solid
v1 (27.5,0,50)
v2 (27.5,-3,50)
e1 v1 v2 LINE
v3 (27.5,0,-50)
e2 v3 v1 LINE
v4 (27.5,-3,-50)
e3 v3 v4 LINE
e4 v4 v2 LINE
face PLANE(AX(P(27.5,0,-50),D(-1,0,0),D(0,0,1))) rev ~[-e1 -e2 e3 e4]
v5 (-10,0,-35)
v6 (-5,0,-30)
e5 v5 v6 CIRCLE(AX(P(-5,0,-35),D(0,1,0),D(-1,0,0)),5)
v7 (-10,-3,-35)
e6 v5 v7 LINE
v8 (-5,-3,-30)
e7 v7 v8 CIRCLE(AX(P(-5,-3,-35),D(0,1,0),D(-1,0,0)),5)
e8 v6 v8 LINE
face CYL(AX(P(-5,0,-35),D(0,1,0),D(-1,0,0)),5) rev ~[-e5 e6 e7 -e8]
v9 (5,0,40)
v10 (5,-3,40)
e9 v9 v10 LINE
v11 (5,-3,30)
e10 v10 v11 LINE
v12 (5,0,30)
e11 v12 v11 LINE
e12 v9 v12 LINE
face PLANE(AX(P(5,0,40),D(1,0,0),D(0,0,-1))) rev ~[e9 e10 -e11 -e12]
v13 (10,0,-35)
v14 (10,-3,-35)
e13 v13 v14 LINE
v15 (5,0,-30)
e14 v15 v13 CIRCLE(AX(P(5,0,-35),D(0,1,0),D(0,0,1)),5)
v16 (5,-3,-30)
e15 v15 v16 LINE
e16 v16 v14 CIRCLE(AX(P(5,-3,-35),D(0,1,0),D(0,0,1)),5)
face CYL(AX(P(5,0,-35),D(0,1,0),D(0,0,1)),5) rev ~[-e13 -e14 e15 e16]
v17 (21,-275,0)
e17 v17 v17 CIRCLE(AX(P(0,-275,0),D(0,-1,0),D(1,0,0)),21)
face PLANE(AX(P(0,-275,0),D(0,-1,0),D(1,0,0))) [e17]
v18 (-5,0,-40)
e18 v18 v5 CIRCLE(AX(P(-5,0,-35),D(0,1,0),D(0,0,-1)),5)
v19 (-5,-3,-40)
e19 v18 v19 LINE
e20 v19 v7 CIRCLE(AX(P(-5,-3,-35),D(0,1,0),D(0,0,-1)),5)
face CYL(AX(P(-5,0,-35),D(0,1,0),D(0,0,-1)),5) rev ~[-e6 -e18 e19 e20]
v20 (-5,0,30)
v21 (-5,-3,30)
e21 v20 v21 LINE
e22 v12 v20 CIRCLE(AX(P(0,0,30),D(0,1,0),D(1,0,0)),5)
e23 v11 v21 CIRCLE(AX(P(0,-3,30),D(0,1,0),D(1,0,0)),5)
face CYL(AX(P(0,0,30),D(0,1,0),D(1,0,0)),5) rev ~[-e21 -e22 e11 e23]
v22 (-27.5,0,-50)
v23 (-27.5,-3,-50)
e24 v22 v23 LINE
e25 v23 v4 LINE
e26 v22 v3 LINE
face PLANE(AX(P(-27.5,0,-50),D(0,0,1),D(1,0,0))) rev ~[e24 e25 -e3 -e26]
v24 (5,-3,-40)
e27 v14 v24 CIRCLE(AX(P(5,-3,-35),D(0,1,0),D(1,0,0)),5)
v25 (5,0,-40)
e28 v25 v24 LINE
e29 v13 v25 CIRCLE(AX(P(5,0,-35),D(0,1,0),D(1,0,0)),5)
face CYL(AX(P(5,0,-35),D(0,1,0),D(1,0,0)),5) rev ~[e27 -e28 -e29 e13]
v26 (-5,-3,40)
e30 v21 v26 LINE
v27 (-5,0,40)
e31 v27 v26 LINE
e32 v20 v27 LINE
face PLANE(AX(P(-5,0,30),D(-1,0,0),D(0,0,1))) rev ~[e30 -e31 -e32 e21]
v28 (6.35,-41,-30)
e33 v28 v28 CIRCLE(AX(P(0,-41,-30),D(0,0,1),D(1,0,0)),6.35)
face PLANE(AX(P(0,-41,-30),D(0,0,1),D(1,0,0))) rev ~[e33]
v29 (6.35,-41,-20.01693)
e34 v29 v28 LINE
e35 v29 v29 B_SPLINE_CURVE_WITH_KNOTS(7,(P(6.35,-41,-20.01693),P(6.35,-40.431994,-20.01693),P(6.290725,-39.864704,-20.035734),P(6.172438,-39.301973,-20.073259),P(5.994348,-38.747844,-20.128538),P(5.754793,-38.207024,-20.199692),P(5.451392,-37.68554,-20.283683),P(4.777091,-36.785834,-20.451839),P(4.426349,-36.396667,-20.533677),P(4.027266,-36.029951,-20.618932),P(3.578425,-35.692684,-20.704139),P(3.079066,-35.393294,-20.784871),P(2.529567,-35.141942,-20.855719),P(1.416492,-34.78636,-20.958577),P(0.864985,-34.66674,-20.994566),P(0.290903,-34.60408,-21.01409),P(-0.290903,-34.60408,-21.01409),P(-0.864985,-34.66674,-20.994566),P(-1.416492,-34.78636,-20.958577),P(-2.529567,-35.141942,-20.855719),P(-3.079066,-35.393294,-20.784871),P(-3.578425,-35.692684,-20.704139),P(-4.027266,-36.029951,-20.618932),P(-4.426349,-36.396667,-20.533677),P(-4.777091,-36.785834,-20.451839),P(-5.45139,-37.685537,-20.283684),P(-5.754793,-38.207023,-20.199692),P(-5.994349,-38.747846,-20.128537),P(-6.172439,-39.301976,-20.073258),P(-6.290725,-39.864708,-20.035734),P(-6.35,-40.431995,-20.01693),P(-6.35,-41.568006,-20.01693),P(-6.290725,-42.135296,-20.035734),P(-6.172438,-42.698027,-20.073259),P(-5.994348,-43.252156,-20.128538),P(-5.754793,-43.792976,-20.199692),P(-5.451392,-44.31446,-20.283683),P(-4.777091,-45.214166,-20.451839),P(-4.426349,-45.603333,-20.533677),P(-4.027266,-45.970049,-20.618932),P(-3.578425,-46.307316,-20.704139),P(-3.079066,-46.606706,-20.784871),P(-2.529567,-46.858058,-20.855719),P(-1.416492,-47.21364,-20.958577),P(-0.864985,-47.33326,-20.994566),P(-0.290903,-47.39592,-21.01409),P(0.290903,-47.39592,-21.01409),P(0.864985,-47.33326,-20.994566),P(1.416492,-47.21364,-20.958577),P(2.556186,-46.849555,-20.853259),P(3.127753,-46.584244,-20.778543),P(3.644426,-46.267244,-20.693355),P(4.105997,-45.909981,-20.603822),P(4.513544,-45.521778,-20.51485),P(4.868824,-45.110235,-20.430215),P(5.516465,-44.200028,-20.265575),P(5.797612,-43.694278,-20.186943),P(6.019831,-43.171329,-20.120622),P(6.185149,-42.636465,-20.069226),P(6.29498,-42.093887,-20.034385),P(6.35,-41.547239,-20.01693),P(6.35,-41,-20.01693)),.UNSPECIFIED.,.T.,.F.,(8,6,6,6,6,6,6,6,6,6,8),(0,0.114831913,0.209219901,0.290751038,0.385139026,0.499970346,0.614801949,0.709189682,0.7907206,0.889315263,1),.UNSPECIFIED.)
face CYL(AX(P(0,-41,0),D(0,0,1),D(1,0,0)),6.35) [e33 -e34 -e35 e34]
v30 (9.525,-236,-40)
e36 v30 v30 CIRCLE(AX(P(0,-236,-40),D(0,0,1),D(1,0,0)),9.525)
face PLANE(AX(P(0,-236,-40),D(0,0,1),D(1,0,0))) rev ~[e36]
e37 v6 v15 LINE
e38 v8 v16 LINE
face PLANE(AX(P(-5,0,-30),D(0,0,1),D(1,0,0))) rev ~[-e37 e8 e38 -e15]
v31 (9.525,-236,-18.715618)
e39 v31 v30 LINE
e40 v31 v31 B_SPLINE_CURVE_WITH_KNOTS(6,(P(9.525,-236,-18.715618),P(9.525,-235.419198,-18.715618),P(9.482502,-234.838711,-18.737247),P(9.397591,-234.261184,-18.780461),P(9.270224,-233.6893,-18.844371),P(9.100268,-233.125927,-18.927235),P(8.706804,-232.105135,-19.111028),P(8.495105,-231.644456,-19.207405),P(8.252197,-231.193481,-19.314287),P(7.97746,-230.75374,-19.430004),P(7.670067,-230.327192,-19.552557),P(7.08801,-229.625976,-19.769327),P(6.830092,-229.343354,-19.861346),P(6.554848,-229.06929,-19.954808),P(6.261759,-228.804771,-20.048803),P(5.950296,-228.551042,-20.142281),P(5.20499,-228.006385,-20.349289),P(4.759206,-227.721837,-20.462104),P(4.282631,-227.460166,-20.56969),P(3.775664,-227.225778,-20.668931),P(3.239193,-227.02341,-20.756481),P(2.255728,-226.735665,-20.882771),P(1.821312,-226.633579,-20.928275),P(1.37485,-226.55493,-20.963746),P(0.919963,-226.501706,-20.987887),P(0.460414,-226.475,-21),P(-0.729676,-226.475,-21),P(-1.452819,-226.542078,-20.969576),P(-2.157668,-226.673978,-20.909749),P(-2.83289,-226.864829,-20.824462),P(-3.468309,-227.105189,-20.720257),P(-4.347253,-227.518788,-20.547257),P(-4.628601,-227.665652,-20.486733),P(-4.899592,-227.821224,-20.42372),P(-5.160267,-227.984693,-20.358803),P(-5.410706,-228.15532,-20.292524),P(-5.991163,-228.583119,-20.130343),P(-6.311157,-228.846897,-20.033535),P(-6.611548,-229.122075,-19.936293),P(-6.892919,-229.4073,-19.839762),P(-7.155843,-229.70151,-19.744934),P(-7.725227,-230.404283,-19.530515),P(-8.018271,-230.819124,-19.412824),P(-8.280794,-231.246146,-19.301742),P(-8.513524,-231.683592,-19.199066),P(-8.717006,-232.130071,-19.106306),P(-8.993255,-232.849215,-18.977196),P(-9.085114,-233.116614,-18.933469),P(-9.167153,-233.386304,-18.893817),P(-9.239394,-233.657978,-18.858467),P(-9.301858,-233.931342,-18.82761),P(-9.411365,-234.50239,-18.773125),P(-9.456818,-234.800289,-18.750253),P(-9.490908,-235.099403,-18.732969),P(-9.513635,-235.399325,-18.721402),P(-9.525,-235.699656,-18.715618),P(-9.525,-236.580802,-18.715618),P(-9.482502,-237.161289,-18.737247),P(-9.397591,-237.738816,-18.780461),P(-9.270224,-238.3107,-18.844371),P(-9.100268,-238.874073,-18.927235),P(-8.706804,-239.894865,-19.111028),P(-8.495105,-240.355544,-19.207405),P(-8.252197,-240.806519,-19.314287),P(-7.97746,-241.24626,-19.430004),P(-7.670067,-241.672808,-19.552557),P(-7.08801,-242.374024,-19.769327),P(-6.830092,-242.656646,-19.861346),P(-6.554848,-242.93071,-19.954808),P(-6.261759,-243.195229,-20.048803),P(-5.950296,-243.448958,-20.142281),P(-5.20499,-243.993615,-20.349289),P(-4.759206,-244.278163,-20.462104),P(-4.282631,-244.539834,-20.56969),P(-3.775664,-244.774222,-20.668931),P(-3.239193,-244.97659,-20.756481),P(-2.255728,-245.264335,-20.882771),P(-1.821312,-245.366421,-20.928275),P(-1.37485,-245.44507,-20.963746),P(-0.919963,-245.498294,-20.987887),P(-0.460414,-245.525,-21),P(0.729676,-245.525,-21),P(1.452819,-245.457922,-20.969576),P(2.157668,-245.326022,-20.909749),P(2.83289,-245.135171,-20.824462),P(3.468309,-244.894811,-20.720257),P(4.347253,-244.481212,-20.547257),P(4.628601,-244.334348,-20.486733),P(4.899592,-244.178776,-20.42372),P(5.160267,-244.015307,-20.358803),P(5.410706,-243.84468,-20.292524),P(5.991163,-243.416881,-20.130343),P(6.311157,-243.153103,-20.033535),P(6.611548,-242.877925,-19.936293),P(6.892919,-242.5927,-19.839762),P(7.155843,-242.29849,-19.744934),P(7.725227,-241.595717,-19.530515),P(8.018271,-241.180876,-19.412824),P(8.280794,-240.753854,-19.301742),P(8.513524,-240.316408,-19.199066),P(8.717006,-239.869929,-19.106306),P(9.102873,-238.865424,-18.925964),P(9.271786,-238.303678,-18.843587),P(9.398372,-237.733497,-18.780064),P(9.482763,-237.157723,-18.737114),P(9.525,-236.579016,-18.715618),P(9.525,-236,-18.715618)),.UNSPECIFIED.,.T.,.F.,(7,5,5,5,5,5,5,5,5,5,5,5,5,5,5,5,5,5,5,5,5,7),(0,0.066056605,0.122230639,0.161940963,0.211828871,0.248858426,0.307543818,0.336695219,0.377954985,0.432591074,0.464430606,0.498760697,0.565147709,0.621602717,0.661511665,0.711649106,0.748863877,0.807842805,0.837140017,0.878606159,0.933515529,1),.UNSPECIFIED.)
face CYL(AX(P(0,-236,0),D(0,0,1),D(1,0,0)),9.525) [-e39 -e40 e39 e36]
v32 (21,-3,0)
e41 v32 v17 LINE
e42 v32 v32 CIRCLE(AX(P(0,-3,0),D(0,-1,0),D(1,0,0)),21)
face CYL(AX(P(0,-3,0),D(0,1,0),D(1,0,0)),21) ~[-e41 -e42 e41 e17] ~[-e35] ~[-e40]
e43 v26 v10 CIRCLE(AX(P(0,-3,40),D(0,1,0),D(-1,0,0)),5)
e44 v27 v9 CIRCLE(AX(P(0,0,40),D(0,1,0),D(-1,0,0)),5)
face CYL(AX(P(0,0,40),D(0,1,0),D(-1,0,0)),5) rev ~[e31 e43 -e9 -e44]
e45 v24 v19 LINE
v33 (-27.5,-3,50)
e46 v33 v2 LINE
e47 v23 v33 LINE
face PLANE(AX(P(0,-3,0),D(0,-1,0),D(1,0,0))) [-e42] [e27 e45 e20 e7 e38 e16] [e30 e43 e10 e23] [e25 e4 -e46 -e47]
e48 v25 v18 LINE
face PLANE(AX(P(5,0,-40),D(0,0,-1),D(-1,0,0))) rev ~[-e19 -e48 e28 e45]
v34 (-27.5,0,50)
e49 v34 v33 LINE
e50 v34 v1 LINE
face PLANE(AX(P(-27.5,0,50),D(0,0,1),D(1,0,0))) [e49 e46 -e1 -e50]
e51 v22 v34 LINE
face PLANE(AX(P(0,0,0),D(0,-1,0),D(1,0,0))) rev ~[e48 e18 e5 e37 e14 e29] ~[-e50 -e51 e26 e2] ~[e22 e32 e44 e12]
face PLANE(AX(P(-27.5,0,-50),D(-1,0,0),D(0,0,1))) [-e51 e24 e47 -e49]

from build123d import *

# Parameters (mm, degrees)
F0_W     = 55
F0_H     = 100
F1_DEPTH = 3
F2_R     = 21
F3_DEPTH = 272
F4_R     = 6.35
F5_DEPTH = 30
F4_R_2   = 9.525
F6_DEPTH = 40


# Not quite as in the source:
# - a feature names something its author has since deleted; it is built from what else it names


with BuildPart() as f1:
    # F0 (on Front) → F1 (new body)
    with BuildSketch(Plane.XZ):
        Rectangle(F0_W, F0_H)
        with BuildLine():
            ThreePointArc((-10, -35), (-8.5355339059, -31.4644660941), (-5, -30))
            Line((-5, -30), (0, -30))
            Line((0, -30), (5, -30))
            ThreePointArc((5, -30), (8.5355339059, -31.4644660941), (10, -35))
            ThreePointArc((10, -35), (8.5355339059, -38.5355339059), (5, -40))
            Line((5, -40), (0, -40))
            Line((0, -40), (-5, -40))
            ThreePointArc((-5, -40), (-8.5355339059, -38.5355339059), (-10, -35))
        make_face(mode=Mode.SUBTRACT)
        with BuildLine():
            Line((-5, 30), (-5, 40))
            ThreePointArc((-5, 40), (0, 45), (5, 40))
            Line((5, 40), (5, 30))
            ThreePointArc((5, 30), (0, 25), (-5, 30))
        make_face(mode=Mode.SUBTRACT)
    extrude(amount=F1_DEPTH)

    # F2 (on face) → F3 (join)
    with BuildSketch(Plane.XZ.offset(3)):
        Circle(F2_R)
    extrude(amount=F3_DEPTH)

    # F4 (on Top) → F5 (join)
    with BuildSketch(Plane.XY):
        with Locations((0, -41)):
            Circle(F4_R)
    extrude(amount=-F5_DEPTH)

    # F4 (on Top) → F6 (join)
    with BuildSketch(Plane.XY):
        with Locations((0, -236)):
            Circle(F4_R_2)
    extrude(amount=-F6_DEPTH)


solid = f1.part
